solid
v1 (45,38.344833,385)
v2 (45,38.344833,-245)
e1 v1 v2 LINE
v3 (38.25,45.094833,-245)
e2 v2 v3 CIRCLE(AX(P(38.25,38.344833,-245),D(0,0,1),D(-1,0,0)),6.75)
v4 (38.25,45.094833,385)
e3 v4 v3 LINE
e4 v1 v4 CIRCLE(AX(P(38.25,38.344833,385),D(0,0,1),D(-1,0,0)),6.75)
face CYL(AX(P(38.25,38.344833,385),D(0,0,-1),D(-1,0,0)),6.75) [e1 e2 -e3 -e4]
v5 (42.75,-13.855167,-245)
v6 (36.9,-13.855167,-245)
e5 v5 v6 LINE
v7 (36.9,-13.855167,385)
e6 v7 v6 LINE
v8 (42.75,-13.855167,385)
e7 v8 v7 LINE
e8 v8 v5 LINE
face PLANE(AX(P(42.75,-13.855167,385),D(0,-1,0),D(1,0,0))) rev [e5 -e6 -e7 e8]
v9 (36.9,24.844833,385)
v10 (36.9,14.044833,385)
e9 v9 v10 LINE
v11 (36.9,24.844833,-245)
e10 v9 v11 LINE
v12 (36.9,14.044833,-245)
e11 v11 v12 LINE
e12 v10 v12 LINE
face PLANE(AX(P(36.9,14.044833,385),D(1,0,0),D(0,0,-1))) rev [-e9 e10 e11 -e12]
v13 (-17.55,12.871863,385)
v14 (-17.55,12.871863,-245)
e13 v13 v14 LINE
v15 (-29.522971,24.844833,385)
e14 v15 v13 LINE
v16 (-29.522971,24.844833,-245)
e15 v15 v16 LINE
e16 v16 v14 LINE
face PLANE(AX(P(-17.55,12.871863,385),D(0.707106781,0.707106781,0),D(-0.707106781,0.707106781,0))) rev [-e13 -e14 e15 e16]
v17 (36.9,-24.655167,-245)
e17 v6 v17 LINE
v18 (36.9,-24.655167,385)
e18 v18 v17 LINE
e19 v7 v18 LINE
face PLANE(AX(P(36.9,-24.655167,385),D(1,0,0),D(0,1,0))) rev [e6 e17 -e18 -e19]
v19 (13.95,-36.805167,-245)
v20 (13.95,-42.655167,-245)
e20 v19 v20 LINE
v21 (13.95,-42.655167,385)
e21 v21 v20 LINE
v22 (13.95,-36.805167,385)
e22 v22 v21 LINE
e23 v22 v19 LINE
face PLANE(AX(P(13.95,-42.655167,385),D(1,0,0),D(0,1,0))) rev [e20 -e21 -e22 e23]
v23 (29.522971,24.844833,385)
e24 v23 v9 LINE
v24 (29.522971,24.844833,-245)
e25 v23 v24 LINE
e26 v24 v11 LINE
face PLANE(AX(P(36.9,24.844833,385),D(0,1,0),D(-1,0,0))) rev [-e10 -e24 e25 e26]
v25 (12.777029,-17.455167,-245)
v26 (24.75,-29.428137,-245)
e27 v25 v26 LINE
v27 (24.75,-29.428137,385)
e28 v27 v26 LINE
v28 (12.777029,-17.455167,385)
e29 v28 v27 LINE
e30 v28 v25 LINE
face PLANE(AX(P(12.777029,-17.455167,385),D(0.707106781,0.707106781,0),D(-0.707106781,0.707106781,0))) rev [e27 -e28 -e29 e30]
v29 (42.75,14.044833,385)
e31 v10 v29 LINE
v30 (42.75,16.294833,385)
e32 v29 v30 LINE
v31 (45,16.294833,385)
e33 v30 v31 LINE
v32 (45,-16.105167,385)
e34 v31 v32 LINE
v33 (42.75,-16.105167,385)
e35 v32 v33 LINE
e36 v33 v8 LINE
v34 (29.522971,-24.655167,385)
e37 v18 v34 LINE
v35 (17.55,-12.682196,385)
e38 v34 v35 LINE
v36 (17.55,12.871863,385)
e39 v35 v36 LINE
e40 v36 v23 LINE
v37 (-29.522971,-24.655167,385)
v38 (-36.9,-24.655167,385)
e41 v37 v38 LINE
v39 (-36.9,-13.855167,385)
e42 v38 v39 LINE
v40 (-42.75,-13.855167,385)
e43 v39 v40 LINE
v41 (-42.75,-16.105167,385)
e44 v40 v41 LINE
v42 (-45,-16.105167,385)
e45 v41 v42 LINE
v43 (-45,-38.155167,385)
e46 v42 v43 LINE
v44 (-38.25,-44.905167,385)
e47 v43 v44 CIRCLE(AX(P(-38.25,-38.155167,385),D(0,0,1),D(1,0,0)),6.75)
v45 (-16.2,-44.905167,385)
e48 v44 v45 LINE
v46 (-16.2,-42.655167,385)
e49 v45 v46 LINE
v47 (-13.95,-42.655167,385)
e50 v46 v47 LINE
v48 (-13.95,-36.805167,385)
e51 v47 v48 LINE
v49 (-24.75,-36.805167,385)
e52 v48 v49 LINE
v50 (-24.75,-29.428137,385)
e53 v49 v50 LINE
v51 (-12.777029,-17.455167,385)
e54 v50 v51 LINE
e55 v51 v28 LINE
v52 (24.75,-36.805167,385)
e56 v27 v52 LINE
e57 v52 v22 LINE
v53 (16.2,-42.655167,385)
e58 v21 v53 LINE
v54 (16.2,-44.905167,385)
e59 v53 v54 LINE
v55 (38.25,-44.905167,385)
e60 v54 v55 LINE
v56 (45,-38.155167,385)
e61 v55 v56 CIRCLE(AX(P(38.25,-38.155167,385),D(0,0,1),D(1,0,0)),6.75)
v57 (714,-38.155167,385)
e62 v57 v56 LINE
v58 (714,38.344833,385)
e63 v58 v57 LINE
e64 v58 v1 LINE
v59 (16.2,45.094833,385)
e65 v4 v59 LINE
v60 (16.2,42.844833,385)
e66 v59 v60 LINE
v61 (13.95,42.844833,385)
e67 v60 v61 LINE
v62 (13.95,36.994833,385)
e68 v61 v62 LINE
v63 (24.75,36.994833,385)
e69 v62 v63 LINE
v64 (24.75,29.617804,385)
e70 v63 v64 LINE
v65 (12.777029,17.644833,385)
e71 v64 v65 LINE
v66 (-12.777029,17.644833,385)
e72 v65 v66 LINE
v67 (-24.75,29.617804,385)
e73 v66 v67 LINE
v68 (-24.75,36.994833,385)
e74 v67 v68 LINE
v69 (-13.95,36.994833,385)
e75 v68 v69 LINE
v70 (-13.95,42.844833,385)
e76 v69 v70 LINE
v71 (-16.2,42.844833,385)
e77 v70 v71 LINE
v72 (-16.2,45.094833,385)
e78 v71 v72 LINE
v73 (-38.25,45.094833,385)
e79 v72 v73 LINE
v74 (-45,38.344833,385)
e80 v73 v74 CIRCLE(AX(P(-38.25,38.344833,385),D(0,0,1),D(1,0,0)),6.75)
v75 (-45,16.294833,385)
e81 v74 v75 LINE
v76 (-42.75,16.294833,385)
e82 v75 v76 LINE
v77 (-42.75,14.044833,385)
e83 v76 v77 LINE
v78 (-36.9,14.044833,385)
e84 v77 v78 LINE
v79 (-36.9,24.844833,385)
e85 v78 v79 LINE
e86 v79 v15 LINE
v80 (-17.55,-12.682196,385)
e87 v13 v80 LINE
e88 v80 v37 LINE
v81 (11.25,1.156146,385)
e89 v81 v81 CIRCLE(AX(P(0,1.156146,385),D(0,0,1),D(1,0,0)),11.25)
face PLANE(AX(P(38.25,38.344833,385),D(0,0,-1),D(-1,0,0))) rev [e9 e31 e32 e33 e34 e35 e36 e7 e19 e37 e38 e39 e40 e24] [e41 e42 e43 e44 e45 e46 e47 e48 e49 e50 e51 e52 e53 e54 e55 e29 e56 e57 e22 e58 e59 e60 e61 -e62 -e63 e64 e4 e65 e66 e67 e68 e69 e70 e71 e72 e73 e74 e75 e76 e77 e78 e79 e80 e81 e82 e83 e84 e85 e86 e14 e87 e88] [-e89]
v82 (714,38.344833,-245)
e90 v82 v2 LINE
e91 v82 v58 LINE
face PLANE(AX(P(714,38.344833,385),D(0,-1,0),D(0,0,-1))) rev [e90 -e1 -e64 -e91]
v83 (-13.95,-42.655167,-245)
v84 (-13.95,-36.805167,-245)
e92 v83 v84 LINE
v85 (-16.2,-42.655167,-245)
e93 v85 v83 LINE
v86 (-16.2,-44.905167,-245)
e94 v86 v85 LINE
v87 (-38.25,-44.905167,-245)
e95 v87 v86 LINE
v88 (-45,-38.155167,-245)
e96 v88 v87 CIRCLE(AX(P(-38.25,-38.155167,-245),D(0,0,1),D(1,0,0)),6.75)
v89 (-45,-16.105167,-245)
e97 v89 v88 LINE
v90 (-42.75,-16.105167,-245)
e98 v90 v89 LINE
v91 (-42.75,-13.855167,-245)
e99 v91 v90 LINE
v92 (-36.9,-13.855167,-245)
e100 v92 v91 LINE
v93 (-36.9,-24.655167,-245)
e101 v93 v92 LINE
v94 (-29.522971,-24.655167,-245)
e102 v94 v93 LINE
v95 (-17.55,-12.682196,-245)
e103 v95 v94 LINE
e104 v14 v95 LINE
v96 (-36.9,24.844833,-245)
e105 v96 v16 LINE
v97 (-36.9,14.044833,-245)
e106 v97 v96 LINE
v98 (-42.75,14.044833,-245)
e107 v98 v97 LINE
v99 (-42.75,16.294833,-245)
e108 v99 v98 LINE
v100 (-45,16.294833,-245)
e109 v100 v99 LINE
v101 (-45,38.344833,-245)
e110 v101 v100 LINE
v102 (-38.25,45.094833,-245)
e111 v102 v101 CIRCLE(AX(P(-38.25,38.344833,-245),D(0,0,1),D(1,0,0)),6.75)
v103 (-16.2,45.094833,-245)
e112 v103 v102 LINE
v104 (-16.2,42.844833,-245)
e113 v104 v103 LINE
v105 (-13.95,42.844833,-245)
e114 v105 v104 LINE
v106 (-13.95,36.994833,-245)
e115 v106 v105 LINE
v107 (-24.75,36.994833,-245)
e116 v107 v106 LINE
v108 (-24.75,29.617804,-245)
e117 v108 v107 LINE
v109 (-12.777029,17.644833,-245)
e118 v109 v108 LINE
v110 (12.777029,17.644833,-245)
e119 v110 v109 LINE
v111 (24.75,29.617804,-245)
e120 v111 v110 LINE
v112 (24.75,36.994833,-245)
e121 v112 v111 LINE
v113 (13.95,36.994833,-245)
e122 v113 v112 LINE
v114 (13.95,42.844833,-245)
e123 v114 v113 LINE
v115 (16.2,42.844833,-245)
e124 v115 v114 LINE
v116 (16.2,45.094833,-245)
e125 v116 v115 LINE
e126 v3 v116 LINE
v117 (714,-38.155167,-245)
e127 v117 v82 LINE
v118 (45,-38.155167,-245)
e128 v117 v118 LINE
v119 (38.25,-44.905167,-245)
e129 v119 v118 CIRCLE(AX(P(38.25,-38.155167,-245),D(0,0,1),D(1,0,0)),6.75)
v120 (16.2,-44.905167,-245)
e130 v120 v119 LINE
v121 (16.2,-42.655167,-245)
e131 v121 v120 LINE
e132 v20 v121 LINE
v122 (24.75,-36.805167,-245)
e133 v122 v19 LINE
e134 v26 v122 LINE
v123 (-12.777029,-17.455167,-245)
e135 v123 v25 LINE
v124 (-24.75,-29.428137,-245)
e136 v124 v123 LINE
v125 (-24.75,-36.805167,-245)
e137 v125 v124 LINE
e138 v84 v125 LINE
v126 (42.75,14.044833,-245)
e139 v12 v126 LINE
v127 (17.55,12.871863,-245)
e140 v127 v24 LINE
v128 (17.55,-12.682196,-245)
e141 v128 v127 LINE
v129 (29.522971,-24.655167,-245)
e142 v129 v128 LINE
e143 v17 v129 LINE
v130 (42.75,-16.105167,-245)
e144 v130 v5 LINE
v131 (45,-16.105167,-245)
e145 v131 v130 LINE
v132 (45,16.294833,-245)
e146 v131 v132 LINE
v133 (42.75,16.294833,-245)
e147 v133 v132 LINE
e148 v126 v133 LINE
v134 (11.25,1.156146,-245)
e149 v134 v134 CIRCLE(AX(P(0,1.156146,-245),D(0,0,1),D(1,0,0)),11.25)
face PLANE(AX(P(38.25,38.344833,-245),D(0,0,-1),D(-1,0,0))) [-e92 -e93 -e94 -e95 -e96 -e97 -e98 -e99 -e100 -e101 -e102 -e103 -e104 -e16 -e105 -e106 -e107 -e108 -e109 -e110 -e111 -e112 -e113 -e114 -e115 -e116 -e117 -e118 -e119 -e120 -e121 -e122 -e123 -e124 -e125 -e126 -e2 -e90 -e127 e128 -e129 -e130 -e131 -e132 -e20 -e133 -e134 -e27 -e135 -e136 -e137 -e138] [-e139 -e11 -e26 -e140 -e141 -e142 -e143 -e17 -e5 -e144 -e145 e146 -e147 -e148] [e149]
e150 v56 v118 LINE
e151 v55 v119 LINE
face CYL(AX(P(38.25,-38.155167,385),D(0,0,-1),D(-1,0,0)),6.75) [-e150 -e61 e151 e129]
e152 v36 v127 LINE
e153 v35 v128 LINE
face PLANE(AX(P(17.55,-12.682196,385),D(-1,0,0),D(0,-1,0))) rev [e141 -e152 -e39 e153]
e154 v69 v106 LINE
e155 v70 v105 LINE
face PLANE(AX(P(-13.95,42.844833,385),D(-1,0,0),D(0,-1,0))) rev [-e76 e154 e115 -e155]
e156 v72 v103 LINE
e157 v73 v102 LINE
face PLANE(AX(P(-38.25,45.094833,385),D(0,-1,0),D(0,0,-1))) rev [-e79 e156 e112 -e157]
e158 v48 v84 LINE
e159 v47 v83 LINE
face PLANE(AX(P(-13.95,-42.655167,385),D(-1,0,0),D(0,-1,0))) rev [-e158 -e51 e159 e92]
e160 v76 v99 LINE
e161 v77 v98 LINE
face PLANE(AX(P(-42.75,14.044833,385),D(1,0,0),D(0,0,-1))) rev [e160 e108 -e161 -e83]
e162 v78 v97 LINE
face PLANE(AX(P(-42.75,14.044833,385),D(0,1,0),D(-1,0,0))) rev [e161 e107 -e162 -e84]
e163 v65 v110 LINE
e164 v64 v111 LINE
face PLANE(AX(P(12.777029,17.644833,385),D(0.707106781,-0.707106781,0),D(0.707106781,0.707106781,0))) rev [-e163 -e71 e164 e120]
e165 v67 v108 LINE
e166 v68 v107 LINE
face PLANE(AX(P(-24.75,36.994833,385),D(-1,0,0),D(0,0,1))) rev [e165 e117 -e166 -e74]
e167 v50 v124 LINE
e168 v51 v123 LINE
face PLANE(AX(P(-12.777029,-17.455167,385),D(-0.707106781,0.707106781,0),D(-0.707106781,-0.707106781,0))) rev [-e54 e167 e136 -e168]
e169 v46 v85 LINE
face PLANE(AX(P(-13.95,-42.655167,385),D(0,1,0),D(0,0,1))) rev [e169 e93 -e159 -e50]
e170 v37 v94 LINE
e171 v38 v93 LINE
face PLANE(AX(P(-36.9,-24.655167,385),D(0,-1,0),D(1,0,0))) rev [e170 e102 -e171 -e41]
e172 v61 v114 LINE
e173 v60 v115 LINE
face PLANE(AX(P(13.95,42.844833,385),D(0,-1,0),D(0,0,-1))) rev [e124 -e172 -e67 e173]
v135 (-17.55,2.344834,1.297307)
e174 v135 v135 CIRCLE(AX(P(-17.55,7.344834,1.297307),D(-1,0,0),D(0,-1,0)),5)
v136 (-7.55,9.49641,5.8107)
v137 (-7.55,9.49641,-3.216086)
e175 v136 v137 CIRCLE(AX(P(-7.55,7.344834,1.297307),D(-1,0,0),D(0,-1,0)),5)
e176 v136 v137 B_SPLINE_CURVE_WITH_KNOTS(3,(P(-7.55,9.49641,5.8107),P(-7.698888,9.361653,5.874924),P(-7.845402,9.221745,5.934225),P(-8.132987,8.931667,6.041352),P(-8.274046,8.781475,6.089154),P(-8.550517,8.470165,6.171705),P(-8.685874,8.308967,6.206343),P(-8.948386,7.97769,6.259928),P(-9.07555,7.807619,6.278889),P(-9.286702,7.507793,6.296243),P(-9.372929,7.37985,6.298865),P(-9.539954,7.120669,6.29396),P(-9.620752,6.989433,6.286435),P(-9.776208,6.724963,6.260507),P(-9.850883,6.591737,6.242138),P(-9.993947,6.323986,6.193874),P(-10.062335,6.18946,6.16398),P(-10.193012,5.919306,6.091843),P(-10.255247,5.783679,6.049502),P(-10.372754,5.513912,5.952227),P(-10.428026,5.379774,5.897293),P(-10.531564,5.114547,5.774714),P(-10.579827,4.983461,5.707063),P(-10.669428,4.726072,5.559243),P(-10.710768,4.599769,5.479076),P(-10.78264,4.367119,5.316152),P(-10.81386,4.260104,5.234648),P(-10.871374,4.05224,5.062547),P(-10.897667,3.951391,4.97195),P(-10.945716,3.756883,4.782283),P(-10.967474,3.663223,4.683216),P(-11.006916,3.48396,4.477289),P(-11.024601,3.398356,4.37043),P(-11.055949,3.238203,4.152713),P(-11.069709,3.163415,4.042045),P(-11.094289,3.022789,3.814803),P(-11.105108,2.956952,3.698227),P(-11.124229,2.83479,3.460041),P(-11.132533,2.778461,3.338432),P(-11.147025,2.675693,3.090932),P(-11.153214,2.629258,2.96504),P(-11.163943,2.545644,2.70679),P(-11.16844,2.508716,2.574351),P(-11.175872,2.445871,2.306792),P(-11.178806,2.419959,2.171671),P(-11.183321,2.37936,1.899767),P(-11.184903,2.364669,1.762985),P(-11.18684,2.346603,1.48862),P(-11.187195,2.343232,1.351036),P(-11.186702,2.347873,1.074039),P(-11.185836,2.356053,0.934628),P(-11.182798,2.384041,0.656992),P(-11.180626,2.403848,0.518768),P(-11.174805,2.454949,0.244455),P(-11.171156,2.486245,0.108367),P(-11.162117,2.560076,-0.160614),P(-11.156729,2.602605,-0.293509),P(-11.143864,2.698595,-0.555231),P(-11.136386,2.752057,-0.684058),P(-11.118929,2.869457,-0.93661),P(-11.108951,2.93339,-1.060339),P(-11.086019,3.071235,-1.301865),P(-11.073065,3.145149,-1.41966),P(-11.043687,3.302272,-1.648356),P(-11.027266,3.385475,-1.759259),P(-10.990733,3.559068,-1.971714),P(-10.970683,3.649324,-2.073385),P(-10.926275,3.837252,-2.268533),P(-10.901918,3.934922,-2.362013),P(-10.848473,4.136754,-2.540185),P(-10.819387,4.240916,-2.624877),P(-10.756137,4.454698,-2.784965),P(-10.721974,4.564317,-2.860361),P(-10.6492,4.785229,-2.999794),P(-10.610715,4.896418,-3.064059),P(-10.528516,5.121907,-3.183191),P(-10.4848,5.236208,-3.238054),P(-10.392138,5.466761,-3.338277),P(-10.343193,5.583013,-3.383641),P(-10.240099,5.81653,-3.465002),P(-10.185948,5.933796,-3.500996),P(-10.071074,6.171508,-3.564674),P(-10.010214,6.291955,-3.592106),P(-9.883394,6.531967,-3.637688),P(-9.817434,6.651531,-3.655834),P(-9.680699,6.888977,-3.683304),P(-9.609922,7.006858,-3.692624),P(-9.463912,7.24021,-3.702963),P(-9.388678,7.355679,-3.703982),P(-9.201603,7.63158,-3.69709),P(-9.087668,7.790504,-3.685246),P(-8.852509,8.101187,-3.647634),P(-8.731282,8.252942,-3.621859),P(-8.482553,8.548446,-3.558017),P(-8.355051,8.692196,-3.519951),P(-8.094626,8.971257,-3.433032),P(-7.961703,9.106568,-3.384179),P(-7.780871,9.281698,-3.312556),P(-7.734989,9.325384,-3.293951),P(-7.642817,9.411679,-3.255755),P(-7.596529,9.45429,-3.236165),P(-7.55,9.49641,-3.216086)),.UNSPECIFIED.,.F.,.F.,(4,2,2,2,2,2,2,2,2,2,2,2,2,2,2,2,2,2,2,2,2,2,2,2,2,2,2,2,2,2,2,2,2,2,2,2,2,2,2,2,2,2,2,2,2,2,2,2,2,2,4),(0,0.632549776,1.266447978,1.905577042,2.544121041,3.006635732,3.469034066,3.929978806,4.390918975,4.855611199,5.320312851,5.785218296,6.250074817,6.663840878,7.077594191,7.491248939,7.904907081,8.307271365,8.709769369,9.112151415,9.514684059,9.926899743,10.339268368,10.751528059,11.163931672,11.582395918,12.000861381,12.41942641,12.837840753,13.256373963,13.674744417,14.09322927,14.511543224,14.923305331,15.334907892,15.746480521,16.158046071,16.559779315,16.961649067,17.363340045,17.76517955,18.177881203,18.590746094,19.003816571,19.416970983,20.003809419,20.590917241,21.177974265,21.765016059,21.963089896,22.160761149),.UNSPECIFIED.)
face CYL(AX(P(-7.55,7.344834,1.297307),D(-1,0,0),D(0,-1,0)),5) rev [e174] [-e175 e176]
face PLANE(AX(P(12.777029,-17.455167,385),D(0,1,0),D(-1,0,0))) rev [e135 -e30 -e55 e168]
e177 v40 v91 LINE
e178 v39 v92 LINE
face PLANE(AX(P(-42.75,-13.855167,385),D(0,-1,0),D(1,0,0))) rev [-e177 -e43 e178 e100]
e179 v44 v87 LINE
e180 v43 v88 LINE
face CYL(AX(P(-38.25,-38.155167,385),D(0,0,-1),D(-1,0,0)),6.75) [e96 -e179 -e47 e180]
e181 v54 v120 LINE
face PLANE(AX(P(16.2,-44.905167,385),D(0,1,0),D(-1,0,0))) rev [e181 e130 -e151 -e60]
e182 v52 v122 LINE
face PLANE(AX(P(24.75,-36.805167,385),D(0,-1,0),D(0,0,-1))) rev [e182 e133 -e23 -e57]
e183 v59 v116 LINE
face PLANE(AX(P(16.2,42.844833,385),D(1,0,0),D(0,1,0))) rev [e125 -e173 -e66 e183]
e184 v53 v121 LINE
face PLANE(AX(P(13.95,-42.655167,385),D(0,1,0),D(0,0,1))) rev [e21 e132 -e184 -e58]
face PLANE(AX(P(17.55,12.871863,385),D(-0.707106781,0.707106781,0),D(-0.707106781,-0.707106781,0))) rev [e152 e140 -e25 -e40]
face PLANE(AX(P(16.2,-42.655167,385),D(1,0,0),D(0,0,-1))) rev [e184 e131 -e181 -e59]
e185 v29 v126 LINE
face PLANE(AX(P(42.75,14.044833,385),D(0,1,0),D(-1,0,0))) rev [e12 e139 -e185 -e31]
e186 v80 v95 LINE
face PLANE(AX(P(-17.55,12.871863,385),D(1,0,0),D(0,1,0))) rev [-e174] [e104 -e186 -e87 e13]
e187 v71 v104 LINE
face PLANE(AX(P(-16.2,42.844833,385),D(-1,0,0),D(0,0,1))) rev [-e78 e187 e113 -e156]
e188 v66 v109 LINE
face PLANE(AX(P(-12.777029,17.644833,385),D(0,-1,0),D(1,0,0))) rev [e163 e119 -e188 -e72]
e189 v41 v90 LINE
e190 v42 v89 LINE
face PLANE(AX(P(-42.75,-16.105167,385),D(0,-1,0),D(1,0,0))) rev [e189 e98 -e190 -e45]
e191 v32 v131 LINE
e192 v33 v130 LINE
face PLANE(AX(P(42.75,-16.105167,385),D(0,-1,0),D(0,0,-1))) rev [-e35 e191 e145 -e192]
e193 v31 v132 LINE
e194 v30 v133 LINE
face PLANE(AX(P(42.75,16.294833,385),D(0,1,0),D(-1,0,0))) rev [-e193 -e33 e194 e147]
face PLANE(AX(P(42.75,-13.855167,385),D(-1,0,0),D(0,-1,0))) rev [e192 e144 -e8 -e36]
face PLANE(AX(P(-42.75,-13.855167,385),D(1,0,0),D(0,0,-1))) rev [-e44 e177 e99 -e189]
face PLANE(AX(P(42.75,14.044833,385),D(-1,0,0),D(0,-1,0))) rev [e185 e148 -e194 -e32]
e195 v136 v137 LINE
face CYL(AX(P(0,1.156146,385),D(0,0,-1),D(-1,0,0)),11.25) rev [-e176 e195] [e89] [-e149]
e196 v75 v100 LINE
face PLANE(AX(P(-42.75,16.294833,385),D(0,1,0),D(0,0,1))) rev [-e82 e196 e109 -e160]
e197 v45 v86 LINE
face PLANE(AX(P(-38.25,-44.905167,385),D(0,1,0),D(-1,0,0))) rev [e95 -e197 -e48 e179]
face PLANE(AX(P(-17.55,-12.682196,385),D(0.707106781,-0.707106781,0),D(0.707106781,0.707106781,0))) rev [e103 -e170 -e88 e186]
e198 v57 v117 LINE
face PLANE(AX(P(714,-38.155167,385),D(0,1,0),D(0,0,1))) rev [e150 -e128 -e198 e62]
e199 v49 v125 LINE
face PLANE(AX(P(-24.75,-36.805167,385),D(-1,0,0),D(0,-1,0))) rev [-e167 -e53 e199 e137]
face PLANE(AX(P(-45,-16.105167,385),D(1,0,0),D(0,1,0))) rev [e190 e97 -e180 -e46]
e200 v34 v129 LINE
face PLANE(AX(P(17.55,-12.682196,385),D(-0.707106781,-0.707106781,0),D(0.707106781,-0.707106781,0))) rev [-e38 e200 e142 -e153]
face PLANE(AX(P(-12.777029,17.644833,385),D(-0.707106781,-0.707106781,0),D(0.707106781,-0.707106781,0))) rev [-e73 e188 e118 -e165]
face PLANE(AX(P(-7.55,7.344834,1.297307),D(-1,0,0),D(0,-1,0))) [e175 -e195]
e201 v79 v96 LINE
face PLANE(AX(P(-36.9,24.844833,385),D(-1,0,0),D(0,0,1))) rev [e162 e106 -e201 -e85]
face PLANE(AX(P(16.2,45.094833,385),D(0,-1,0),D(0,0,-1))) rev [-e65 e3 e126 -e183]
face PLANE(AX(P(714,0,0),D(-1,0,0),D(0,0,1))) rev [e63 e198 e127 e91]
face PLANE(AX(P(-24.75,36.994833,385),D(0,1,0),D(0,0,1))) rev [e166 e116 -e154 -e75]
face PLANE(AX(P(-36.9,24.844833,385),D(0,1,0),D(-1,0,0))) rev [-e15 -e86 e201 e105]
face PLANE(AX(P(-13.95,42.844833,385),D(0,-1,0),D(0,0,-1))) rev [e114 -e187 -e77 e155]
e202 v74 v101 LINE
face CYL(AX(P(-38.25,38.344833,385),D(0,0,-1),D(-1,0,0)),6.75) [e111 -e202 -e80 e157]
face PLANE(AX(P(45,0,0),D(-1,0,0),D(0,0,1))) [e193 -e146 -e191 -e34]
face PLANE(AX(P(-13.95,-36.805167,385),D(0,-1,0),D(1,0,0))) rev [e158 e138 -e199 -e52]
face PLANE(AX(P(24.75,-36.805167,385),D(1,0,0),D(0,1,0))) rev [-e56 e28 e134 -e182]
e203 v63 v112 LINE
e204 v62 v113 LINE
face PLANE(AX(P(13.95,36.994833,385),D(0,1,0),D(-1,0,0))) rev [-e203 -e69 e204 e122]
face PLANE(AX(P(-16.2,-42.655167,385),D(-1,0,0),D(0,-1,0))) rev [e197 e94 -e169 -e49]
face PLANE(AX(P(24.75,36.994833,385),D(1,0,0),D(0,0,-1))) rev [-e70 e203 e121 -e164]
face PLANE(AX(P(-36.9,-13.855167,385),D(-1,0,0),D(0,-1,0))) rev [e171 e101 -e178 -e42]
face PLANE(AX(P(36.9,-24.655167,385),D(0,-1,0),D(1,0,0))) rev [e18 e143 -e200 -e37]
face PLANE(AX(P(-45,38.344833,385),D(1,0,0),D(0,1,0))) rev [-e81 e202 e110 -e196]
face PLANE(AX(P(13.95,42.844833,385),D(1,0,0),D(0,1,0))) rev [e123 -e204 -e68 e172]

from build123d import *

# Parameters (mm, degrees)
SKETCH1_R           = 2.5
BOSS_EXTRUDE1_DEPTH = 140
SCALE_2_SCALE       = 3
SCALE_3_SCALE       = 6
SCALE_5_SCALE       = 2
SCALE_6_SCALE       = 0.25
SCALE_7_SCALE       = 0.125
SCALE_8_SCALE       = 0.25
SCALE_9_SCALE       = 4
SCALE_10_SCALE      = 4
OTHER_START         = -17.55
OTHER_1_OUTLINE_R   = 5
OTHER_1_DEPTH       = 10
SKETCH_11_W         = 630
SKETCH_11_H         = 76.5
EXTRUDE_1_DEPTH     = 669


# Read off the part's stored shape, not the designer's step: 孔1
with BuildPart() as part:
    # Sketch1 → Boss-Extrude1 (new body)
    with BuildSketch(Plane.XY):
        with BuildLine():
            Line((2.839339828, 3.9), (5.5, 6.560660172))
            Line((5.5, 6.560660172), (5.5, 8.2))
            Line((5.5, 8.2), (3.1, 8.2))
            Line((3.1, 8.2), (3.1, 9.5))
            Line((3.1, 9.5), (3.6, 9.5))
            Line((3.6, 9.5), (3.6, 10))
            Line((3.6, 10), (8.5, 10))
            ThreePointArc((8.5, 10), (9.560660172, 9.560660172), (10, 8.5))
            Line((10, 8.5), (10, 3.6))
            Line((10, 3.6), (9.5, 3.6))
            Line((9.5, 3.6), (9.5, 3.1))
            Line((9.5, 3.1), (8.2, 3.1))
            Line((8.2, 3.1), (8.2, 5.5))
            Line((8.2, 5.5), (6.560660172, 5.5))
            Line((6.560660172, 5.5), (3.9, 2.839339828))
            Line((3.9, 2.839339828), (3.9, -2.839339828))
            Line((3.9, -2.839339828), (6.560660172, -5.5))
            Line((6.560660172, -5.5), (8.2, -5.5))
            Line((8.2, -5.5), (8.2, -3.1))
            Line((8.2, -3.1), (9.5, -3.1))
            Line((9.5, -3.1), (9.5, -3.6))
            Line((9.5, -3.6), (10, -3.6))
            Line((10, -3.6), (10, -8.5))
            ThreePointArc((10, -8.5), (9.560660172, -9.560660172), (8.5, -10))
            Line((8.5, -10), (3.6, -10))
            Line((3.6, -10), (3.6, -9.5))
            Line((3.6, -9.5), (3.1, -9.5))
            Line((3.1, -9.5), (3.1, -8.2))
            Line((3.1, -8.2), (5.5, -8.2))
            Line((5.5, -8.2), (5.5, -6.560660172))
            Line((5.5, -6.560660172), (2.839339828, -3.9))
            Line((2.839339828, -3.9), (-2.839339828, -3.9))
            Line((-2.839339828, -3.9), (-5.5, -6.560660172))
            Line((-5.5, -6.560660172), (-5.5, -8.2))
            Line((-5.5, -8.2), (-3.1, -8.2))
            Line((-3.1, -8.2), (-3.1, -9.5))
            Line((-3.1, -9.5), (-3.6, -9.5))
            Line((-3.6, -9.5), (-3.6, -10))
            Line((-3.6, -10), (-8.5, -10))
            ThreePointArc((-8.5, -10), (-9.560660172, -9.560660172), (-10, -8.5))
            Line((-10, -8.5), (-10, -3.6))
            Line((-10, -3.6), (-9.5, -3.6))
            Line((-9.5, -3.6), (-9.5, -3.1))
            Line((-9.5, -3.1), (-8.2, -3.1))
            Line((-8.2, -3.1), (-8.2, -5.5))
            Line((-8.2, -5.5), (-6.560660172, -5.5))
            Line((-6.560660172, -5.5), (-3.9, -2.839339828))
            Line((-3.9, -2.839339828), (-3.9, 2.839339828))
            Line((-3.9, 2.839339828), (-6.560660172, 5.5))
            Line((-6.560660172, 5.5), (-8.2, 5.5))
            Line((-8.2, 5.5), (-8.2, 3.1))
            Line((-8.2, 3.1), (-9.5, 3.1))
            Line((-9.5, 3.1), (-9.5, 3.6))
            Line((-9.5, 3.6), (-10, 3.6))
            Line((-10, 3.6), (-10, 8.5))
            ThreePointArc((-10, 8.5), (-9.560660172, 9.560660172), (-8.5, 10))
            Line((-8.5, 10), (-3.6, 10))
            Line((-3.6, 10), (-3.6, 9.5))
            Line((-3.6, 9.5), (-3.1, 9.5))
            Line((-3.1, 9.5), (-3.1, 8.2))
            Line((-3.1, 8.2), (-5.5, 8.2))
            Line((-5.5, 8.2), (-5.5, 6.560660172))
            Line((-5.5, 6.560660172), (-2.839339828, 3.9))
            Line((-2.839339828, 3.9), (2.839339828, 3.9))
        make_face()
        with Locations((0, 0.235847297)):
            Circle(SKETCH1_R, mode=Mode.SUBTRACT)
    extrude(amount=BOSS_EXTRUDE1_DEPTH)


with BuildPart() as part_1:
    # 缩放比例2: scaled about (0, -0.027095247, 70)
    add(part.part.scale(SCALE_2_SCALE).moved(Location((0, 0.054190494, -140))))


with BuildPart() as part_2:
    # 缩放比例3: scaled about (0, -0.027095247, 70)
    add(part_1.part.scale(SCALE_3_SCALE).moved(Location((0, 0.135476235, -350))))


with BuildPart() as part_3:
    # 缩放比例5: scaled about (0, -0.027095249, 70)
    add(part_2.part.scale(SCALE_5_SCALE).moved(Location((0, 0.027095249, -70))))


with BuildPart() as part_4:
    # 缩放比例6: scaled about (0, -0.027095249, 70)
    add(part_3.part.scale(SCALE_6_SCALE).moved(Location((0, -0.020321437, 52.5))))


with BuildPart() as part_5:
    # 缩放比例7: scaled about (0, -0.027095249, 70)
    add(part_4.part.scale(SCALE_7_SCALE).moved(Location((0, -0.023708343, 61.25))))


with BuildPart() as part_6:
    # 缩放比例8: scaled about (0, -0.027095249, 70)
    add(part_5.part.scale(SCALE_8_SCALE).moved(Location((0, -0.020321437, 52.5))))


with BuildPart() as part_7:
    # 缩放比例9: scaled about (0, -0.027095249, 70)
    add(part_6.part.scale(SCALE_9_SCALE).moved(Location((0, 0.081285747, -210))))


with BuildPart() as part_8:
    # 缩放比例10: scaled about (0, -0.027095249, 70)
    add(part_7.part.scale(SCALE_10_SCALE).moved(Location((0, 0.081285747, -210))))

    # 孔1 outline → 孔1 (cut)
    with BuildSketch(Plane.YZ.offset(OTHER_START)):
        with Locations((7.344833538, 1.297306883)):
            Circle(OTHER_1_OUTLINE_R)
    extrude(amount=OTHER_1_DEPTH, mode=Mode.SUBTRACT)

    # 草图11 → 凸台-拉伸1 (add)
    with BuildSketch(Plane(origin=(45, 0, 0), x_dir=(0, 0, -1), z_dir=(1, 0, 0))):
        with Locations((-70, 0.094833365)):
            Rectangle(SKETCH_11_W, SKETCH_11_H)
    extrude(amount=EXTRUDE_1_DEPTH)


solid = part_8.part
